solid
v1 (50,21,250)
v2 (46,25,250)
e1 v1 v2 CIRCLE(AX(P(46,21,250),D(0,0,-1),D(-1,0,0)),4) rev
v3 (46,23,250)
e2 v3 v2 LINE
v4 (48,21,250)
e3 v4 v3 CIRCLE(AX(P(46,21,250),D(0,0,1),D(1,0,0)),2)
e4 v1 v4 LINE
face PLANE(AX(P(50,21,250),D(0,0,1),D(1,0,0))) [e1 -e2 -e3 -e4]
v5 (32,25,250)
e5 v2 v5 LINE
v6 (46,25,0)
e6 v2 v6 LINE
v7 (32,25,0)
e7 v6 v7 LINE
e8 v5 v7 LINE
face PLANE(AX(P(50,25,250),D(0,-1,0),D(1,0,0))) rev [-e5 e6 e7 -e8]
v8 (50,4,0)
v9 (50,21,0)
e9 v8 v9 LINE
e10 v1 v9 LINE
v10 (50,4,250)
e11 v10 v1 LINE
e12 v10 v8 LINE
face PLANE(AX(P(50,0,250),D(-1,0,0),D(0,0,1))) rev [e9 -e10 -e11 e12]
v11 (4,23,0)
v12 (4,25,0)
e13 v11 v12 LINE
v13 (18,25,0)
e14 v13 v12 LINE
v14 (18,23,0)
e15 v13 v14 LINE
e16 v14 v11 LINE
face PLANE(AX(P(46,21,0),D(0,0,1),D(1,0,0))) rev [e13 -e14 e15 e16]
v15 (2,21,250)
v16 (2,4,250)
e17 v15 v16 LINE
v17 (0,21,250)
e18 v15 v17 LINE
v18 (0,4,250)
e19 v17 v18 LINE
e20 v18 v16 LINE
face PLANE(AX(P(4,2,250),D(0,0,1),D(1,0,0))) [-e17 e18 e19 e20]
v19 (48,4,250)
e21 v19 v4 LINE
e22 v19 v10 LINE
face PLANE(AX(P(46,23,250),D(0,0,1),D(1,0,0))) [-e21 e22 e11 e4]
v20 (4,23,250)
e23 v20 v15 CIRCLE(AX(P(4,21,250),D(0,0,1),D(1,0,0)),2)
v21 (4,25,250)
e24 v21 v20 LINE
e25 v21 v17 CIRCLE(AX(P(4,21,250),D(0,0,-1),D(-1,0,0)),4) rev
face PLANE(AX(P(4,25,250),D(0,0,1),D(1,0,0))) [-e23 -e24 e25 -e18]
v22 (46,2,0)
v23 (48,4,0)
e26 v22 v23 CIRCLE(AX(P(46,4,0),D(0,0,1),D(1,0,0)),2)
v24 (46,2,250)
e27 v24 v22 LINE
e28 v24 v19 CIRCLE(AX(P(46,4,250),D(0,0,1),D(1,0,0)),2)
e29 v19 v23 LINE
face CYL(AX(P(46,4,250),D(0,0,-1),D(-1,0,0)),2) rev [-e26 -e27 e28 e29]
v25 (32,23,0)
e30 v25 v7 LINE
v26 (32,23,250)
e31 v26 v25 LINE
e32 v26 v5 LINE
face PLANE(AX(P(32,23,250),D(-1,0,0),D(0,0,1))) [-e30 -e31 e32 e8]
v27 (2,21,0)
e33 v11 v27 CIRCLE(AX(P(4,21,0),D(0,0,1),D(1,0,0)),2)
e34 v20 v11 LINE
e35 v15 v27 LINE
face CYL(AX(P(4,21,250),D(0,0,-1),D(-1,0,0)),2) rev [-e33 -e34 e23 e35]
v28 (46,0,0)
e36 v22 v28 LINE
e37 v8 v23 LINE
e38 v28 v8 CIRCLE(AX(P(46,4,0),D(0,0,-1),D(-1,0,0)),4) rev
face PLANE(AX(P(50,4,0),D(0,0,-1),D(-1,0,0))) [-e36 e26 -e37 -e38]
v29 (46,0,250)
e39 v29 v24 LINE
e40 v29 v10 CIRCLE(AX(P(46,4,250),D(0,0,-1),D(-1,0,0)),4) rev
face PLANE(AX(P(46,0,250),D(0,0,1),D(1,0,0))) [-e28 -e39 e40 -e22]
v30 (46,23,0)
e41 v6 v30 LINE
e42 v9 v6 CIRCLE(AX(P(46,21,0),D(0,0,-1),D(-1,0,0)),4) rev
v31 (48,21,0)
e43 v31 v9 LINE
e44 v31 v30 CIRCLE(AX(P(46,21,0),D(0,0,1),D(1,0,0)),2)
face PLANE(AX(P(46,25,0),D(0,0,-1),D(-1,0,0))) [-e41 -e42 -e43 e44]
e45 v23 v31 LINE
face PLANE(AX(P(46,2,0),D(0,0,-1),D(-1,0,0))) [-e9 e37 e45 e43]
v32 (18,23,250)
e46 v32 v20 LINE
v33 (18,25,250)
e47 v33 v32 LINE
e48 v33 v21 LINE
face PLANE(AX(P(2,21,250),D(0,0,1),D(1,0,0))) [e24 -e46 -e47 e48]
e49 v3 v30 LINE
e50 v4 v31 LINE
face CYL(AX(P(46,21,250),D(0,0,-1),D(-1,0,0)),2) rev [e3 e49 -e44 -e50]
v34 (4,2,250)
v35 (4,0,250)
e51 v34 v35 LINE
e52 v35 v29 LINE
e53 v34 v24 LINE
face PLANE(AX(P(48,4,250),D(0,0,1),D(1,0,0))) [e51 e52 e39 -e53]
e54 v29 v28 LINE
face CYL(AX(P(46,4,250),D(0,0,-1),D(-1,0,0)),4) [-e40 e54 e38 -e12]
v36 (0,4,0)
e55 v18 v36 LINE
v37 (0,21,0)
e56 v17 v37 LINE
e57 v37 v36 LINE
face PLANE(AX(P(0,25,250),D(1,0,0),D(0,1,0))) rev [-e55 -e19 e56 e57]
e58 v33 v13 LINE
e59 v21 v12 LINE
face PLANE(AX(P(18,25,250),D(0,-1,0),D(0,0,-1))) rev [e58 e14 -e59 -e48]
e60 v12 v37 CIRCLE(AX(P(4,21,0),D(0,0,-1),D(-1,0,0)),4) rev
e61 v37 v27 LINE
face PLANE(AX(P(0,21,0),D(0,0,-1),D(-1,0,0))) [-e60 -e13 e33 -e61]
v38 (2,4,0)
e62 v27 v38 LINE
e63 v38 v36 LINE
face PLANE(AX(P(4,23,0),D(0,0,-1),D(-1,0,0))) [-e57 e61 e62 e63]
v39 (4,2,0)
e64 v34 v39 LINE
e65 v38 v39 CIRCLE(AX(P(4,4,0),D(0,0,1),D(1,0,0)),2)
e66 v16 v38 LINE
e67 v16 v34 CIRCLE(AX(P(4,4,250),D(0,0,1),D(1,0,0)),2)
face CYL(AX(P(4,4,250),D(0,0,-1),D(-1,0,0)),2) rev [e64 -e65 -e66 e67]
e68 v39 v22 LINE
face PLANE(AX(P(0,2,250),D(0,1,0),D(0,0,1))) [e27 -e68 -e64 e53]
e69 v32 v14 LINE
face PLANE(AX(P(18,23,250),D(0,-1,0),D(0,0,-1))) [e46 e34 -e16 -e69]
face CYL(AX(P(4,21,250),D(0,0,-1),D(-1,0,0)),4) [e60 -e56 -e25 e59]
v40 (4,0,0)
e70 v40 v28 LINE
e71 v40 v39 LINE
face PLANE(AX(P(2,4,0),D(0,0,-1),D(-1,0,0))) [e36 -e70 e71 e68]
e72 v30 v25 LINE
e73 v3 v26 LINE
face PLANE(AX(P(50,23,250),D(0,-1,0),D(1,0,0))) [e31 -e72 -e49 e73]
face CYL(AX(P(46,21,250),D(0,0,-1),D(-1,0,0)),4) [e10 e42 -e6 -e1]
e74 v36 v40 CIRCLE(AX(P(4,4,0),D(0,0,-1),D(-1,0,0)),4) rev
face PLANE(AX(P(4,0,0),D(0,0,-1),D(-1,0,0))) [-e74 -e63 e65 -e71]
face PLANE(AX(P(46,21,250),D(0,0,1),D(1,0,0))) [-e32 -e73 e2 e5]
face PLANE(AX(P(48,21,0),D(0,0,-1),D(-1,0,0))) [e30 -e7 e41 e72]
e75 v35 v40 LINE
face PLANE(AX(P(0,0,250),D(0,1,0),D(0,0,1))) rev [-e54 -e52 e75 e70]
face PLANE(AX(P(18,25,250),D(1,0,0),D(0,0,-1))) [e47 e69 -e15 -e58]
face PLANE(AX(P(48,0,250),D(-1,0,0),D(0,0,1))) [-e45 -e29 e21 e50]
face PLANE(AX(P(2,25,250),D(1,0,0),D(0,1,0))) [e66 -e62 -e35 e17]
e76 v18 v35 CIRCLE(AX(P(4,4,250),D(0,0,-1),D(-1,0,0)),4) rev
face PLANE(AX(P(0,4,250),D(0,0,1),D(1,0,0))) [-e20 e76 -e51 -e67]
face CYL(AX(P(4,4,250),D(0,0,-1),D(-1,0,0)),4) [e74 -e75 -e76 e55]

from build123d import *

# Parameters (mm, degrees)
BASE_FLANGE1_DEPTH = 250


# Sheet-metal steps are written as plain solids
with BuildPart() as part:
    # Sketch1 → Base-Flange1 (new body)
    with BuildSketch(Plane.XY):
        with BuildLine():
            Line((18, 25), (4, 25))
            ThreePointArc((4, 25), (1.171572875, 23.828427125), (0, 21))
            Line((0, 21), (0, 4))
            ThreePointArc((0, 4), (1.171572875, 1.171572875), (4, 0))
            Line((4, 0), (46, 0))
            ThreePointArc((46, 0), (48.828427125, 1.171572875), (50, 4))
            Line((50, 4), (50, 21))
            ThreePointArc((50, 21), (48.828427125, 23.828427125), (46, 25))
            Line((46, 25), (32, 25))
            Line((32, 25), (32, 23))
            Line((32, 23), (46, 23))
            ThreePointArc((46, 23), (47.414213562, 22.414213562), (48, 21))
            Line((48, 21), (48, 4))
            ThreePointArc((48, 4), (47.414213562, 2.585786438), (46, 2))
            Line((46, 2), (4, 2))
            ThreePointArc((4, 2), (2.585786438, 2.585786438), (2, 4))
            Line((2, 4), (2, 21))
            ThreePointArc((2, 21), (2.585786438, 22.414213562), (4, 23))
            Line((4, 23), (18, 23))
            Line((18, 23), (18, 25))
        make_face()
    extrude(amount=BASE_FLANGE1_DEPTH)


solid = part.part
